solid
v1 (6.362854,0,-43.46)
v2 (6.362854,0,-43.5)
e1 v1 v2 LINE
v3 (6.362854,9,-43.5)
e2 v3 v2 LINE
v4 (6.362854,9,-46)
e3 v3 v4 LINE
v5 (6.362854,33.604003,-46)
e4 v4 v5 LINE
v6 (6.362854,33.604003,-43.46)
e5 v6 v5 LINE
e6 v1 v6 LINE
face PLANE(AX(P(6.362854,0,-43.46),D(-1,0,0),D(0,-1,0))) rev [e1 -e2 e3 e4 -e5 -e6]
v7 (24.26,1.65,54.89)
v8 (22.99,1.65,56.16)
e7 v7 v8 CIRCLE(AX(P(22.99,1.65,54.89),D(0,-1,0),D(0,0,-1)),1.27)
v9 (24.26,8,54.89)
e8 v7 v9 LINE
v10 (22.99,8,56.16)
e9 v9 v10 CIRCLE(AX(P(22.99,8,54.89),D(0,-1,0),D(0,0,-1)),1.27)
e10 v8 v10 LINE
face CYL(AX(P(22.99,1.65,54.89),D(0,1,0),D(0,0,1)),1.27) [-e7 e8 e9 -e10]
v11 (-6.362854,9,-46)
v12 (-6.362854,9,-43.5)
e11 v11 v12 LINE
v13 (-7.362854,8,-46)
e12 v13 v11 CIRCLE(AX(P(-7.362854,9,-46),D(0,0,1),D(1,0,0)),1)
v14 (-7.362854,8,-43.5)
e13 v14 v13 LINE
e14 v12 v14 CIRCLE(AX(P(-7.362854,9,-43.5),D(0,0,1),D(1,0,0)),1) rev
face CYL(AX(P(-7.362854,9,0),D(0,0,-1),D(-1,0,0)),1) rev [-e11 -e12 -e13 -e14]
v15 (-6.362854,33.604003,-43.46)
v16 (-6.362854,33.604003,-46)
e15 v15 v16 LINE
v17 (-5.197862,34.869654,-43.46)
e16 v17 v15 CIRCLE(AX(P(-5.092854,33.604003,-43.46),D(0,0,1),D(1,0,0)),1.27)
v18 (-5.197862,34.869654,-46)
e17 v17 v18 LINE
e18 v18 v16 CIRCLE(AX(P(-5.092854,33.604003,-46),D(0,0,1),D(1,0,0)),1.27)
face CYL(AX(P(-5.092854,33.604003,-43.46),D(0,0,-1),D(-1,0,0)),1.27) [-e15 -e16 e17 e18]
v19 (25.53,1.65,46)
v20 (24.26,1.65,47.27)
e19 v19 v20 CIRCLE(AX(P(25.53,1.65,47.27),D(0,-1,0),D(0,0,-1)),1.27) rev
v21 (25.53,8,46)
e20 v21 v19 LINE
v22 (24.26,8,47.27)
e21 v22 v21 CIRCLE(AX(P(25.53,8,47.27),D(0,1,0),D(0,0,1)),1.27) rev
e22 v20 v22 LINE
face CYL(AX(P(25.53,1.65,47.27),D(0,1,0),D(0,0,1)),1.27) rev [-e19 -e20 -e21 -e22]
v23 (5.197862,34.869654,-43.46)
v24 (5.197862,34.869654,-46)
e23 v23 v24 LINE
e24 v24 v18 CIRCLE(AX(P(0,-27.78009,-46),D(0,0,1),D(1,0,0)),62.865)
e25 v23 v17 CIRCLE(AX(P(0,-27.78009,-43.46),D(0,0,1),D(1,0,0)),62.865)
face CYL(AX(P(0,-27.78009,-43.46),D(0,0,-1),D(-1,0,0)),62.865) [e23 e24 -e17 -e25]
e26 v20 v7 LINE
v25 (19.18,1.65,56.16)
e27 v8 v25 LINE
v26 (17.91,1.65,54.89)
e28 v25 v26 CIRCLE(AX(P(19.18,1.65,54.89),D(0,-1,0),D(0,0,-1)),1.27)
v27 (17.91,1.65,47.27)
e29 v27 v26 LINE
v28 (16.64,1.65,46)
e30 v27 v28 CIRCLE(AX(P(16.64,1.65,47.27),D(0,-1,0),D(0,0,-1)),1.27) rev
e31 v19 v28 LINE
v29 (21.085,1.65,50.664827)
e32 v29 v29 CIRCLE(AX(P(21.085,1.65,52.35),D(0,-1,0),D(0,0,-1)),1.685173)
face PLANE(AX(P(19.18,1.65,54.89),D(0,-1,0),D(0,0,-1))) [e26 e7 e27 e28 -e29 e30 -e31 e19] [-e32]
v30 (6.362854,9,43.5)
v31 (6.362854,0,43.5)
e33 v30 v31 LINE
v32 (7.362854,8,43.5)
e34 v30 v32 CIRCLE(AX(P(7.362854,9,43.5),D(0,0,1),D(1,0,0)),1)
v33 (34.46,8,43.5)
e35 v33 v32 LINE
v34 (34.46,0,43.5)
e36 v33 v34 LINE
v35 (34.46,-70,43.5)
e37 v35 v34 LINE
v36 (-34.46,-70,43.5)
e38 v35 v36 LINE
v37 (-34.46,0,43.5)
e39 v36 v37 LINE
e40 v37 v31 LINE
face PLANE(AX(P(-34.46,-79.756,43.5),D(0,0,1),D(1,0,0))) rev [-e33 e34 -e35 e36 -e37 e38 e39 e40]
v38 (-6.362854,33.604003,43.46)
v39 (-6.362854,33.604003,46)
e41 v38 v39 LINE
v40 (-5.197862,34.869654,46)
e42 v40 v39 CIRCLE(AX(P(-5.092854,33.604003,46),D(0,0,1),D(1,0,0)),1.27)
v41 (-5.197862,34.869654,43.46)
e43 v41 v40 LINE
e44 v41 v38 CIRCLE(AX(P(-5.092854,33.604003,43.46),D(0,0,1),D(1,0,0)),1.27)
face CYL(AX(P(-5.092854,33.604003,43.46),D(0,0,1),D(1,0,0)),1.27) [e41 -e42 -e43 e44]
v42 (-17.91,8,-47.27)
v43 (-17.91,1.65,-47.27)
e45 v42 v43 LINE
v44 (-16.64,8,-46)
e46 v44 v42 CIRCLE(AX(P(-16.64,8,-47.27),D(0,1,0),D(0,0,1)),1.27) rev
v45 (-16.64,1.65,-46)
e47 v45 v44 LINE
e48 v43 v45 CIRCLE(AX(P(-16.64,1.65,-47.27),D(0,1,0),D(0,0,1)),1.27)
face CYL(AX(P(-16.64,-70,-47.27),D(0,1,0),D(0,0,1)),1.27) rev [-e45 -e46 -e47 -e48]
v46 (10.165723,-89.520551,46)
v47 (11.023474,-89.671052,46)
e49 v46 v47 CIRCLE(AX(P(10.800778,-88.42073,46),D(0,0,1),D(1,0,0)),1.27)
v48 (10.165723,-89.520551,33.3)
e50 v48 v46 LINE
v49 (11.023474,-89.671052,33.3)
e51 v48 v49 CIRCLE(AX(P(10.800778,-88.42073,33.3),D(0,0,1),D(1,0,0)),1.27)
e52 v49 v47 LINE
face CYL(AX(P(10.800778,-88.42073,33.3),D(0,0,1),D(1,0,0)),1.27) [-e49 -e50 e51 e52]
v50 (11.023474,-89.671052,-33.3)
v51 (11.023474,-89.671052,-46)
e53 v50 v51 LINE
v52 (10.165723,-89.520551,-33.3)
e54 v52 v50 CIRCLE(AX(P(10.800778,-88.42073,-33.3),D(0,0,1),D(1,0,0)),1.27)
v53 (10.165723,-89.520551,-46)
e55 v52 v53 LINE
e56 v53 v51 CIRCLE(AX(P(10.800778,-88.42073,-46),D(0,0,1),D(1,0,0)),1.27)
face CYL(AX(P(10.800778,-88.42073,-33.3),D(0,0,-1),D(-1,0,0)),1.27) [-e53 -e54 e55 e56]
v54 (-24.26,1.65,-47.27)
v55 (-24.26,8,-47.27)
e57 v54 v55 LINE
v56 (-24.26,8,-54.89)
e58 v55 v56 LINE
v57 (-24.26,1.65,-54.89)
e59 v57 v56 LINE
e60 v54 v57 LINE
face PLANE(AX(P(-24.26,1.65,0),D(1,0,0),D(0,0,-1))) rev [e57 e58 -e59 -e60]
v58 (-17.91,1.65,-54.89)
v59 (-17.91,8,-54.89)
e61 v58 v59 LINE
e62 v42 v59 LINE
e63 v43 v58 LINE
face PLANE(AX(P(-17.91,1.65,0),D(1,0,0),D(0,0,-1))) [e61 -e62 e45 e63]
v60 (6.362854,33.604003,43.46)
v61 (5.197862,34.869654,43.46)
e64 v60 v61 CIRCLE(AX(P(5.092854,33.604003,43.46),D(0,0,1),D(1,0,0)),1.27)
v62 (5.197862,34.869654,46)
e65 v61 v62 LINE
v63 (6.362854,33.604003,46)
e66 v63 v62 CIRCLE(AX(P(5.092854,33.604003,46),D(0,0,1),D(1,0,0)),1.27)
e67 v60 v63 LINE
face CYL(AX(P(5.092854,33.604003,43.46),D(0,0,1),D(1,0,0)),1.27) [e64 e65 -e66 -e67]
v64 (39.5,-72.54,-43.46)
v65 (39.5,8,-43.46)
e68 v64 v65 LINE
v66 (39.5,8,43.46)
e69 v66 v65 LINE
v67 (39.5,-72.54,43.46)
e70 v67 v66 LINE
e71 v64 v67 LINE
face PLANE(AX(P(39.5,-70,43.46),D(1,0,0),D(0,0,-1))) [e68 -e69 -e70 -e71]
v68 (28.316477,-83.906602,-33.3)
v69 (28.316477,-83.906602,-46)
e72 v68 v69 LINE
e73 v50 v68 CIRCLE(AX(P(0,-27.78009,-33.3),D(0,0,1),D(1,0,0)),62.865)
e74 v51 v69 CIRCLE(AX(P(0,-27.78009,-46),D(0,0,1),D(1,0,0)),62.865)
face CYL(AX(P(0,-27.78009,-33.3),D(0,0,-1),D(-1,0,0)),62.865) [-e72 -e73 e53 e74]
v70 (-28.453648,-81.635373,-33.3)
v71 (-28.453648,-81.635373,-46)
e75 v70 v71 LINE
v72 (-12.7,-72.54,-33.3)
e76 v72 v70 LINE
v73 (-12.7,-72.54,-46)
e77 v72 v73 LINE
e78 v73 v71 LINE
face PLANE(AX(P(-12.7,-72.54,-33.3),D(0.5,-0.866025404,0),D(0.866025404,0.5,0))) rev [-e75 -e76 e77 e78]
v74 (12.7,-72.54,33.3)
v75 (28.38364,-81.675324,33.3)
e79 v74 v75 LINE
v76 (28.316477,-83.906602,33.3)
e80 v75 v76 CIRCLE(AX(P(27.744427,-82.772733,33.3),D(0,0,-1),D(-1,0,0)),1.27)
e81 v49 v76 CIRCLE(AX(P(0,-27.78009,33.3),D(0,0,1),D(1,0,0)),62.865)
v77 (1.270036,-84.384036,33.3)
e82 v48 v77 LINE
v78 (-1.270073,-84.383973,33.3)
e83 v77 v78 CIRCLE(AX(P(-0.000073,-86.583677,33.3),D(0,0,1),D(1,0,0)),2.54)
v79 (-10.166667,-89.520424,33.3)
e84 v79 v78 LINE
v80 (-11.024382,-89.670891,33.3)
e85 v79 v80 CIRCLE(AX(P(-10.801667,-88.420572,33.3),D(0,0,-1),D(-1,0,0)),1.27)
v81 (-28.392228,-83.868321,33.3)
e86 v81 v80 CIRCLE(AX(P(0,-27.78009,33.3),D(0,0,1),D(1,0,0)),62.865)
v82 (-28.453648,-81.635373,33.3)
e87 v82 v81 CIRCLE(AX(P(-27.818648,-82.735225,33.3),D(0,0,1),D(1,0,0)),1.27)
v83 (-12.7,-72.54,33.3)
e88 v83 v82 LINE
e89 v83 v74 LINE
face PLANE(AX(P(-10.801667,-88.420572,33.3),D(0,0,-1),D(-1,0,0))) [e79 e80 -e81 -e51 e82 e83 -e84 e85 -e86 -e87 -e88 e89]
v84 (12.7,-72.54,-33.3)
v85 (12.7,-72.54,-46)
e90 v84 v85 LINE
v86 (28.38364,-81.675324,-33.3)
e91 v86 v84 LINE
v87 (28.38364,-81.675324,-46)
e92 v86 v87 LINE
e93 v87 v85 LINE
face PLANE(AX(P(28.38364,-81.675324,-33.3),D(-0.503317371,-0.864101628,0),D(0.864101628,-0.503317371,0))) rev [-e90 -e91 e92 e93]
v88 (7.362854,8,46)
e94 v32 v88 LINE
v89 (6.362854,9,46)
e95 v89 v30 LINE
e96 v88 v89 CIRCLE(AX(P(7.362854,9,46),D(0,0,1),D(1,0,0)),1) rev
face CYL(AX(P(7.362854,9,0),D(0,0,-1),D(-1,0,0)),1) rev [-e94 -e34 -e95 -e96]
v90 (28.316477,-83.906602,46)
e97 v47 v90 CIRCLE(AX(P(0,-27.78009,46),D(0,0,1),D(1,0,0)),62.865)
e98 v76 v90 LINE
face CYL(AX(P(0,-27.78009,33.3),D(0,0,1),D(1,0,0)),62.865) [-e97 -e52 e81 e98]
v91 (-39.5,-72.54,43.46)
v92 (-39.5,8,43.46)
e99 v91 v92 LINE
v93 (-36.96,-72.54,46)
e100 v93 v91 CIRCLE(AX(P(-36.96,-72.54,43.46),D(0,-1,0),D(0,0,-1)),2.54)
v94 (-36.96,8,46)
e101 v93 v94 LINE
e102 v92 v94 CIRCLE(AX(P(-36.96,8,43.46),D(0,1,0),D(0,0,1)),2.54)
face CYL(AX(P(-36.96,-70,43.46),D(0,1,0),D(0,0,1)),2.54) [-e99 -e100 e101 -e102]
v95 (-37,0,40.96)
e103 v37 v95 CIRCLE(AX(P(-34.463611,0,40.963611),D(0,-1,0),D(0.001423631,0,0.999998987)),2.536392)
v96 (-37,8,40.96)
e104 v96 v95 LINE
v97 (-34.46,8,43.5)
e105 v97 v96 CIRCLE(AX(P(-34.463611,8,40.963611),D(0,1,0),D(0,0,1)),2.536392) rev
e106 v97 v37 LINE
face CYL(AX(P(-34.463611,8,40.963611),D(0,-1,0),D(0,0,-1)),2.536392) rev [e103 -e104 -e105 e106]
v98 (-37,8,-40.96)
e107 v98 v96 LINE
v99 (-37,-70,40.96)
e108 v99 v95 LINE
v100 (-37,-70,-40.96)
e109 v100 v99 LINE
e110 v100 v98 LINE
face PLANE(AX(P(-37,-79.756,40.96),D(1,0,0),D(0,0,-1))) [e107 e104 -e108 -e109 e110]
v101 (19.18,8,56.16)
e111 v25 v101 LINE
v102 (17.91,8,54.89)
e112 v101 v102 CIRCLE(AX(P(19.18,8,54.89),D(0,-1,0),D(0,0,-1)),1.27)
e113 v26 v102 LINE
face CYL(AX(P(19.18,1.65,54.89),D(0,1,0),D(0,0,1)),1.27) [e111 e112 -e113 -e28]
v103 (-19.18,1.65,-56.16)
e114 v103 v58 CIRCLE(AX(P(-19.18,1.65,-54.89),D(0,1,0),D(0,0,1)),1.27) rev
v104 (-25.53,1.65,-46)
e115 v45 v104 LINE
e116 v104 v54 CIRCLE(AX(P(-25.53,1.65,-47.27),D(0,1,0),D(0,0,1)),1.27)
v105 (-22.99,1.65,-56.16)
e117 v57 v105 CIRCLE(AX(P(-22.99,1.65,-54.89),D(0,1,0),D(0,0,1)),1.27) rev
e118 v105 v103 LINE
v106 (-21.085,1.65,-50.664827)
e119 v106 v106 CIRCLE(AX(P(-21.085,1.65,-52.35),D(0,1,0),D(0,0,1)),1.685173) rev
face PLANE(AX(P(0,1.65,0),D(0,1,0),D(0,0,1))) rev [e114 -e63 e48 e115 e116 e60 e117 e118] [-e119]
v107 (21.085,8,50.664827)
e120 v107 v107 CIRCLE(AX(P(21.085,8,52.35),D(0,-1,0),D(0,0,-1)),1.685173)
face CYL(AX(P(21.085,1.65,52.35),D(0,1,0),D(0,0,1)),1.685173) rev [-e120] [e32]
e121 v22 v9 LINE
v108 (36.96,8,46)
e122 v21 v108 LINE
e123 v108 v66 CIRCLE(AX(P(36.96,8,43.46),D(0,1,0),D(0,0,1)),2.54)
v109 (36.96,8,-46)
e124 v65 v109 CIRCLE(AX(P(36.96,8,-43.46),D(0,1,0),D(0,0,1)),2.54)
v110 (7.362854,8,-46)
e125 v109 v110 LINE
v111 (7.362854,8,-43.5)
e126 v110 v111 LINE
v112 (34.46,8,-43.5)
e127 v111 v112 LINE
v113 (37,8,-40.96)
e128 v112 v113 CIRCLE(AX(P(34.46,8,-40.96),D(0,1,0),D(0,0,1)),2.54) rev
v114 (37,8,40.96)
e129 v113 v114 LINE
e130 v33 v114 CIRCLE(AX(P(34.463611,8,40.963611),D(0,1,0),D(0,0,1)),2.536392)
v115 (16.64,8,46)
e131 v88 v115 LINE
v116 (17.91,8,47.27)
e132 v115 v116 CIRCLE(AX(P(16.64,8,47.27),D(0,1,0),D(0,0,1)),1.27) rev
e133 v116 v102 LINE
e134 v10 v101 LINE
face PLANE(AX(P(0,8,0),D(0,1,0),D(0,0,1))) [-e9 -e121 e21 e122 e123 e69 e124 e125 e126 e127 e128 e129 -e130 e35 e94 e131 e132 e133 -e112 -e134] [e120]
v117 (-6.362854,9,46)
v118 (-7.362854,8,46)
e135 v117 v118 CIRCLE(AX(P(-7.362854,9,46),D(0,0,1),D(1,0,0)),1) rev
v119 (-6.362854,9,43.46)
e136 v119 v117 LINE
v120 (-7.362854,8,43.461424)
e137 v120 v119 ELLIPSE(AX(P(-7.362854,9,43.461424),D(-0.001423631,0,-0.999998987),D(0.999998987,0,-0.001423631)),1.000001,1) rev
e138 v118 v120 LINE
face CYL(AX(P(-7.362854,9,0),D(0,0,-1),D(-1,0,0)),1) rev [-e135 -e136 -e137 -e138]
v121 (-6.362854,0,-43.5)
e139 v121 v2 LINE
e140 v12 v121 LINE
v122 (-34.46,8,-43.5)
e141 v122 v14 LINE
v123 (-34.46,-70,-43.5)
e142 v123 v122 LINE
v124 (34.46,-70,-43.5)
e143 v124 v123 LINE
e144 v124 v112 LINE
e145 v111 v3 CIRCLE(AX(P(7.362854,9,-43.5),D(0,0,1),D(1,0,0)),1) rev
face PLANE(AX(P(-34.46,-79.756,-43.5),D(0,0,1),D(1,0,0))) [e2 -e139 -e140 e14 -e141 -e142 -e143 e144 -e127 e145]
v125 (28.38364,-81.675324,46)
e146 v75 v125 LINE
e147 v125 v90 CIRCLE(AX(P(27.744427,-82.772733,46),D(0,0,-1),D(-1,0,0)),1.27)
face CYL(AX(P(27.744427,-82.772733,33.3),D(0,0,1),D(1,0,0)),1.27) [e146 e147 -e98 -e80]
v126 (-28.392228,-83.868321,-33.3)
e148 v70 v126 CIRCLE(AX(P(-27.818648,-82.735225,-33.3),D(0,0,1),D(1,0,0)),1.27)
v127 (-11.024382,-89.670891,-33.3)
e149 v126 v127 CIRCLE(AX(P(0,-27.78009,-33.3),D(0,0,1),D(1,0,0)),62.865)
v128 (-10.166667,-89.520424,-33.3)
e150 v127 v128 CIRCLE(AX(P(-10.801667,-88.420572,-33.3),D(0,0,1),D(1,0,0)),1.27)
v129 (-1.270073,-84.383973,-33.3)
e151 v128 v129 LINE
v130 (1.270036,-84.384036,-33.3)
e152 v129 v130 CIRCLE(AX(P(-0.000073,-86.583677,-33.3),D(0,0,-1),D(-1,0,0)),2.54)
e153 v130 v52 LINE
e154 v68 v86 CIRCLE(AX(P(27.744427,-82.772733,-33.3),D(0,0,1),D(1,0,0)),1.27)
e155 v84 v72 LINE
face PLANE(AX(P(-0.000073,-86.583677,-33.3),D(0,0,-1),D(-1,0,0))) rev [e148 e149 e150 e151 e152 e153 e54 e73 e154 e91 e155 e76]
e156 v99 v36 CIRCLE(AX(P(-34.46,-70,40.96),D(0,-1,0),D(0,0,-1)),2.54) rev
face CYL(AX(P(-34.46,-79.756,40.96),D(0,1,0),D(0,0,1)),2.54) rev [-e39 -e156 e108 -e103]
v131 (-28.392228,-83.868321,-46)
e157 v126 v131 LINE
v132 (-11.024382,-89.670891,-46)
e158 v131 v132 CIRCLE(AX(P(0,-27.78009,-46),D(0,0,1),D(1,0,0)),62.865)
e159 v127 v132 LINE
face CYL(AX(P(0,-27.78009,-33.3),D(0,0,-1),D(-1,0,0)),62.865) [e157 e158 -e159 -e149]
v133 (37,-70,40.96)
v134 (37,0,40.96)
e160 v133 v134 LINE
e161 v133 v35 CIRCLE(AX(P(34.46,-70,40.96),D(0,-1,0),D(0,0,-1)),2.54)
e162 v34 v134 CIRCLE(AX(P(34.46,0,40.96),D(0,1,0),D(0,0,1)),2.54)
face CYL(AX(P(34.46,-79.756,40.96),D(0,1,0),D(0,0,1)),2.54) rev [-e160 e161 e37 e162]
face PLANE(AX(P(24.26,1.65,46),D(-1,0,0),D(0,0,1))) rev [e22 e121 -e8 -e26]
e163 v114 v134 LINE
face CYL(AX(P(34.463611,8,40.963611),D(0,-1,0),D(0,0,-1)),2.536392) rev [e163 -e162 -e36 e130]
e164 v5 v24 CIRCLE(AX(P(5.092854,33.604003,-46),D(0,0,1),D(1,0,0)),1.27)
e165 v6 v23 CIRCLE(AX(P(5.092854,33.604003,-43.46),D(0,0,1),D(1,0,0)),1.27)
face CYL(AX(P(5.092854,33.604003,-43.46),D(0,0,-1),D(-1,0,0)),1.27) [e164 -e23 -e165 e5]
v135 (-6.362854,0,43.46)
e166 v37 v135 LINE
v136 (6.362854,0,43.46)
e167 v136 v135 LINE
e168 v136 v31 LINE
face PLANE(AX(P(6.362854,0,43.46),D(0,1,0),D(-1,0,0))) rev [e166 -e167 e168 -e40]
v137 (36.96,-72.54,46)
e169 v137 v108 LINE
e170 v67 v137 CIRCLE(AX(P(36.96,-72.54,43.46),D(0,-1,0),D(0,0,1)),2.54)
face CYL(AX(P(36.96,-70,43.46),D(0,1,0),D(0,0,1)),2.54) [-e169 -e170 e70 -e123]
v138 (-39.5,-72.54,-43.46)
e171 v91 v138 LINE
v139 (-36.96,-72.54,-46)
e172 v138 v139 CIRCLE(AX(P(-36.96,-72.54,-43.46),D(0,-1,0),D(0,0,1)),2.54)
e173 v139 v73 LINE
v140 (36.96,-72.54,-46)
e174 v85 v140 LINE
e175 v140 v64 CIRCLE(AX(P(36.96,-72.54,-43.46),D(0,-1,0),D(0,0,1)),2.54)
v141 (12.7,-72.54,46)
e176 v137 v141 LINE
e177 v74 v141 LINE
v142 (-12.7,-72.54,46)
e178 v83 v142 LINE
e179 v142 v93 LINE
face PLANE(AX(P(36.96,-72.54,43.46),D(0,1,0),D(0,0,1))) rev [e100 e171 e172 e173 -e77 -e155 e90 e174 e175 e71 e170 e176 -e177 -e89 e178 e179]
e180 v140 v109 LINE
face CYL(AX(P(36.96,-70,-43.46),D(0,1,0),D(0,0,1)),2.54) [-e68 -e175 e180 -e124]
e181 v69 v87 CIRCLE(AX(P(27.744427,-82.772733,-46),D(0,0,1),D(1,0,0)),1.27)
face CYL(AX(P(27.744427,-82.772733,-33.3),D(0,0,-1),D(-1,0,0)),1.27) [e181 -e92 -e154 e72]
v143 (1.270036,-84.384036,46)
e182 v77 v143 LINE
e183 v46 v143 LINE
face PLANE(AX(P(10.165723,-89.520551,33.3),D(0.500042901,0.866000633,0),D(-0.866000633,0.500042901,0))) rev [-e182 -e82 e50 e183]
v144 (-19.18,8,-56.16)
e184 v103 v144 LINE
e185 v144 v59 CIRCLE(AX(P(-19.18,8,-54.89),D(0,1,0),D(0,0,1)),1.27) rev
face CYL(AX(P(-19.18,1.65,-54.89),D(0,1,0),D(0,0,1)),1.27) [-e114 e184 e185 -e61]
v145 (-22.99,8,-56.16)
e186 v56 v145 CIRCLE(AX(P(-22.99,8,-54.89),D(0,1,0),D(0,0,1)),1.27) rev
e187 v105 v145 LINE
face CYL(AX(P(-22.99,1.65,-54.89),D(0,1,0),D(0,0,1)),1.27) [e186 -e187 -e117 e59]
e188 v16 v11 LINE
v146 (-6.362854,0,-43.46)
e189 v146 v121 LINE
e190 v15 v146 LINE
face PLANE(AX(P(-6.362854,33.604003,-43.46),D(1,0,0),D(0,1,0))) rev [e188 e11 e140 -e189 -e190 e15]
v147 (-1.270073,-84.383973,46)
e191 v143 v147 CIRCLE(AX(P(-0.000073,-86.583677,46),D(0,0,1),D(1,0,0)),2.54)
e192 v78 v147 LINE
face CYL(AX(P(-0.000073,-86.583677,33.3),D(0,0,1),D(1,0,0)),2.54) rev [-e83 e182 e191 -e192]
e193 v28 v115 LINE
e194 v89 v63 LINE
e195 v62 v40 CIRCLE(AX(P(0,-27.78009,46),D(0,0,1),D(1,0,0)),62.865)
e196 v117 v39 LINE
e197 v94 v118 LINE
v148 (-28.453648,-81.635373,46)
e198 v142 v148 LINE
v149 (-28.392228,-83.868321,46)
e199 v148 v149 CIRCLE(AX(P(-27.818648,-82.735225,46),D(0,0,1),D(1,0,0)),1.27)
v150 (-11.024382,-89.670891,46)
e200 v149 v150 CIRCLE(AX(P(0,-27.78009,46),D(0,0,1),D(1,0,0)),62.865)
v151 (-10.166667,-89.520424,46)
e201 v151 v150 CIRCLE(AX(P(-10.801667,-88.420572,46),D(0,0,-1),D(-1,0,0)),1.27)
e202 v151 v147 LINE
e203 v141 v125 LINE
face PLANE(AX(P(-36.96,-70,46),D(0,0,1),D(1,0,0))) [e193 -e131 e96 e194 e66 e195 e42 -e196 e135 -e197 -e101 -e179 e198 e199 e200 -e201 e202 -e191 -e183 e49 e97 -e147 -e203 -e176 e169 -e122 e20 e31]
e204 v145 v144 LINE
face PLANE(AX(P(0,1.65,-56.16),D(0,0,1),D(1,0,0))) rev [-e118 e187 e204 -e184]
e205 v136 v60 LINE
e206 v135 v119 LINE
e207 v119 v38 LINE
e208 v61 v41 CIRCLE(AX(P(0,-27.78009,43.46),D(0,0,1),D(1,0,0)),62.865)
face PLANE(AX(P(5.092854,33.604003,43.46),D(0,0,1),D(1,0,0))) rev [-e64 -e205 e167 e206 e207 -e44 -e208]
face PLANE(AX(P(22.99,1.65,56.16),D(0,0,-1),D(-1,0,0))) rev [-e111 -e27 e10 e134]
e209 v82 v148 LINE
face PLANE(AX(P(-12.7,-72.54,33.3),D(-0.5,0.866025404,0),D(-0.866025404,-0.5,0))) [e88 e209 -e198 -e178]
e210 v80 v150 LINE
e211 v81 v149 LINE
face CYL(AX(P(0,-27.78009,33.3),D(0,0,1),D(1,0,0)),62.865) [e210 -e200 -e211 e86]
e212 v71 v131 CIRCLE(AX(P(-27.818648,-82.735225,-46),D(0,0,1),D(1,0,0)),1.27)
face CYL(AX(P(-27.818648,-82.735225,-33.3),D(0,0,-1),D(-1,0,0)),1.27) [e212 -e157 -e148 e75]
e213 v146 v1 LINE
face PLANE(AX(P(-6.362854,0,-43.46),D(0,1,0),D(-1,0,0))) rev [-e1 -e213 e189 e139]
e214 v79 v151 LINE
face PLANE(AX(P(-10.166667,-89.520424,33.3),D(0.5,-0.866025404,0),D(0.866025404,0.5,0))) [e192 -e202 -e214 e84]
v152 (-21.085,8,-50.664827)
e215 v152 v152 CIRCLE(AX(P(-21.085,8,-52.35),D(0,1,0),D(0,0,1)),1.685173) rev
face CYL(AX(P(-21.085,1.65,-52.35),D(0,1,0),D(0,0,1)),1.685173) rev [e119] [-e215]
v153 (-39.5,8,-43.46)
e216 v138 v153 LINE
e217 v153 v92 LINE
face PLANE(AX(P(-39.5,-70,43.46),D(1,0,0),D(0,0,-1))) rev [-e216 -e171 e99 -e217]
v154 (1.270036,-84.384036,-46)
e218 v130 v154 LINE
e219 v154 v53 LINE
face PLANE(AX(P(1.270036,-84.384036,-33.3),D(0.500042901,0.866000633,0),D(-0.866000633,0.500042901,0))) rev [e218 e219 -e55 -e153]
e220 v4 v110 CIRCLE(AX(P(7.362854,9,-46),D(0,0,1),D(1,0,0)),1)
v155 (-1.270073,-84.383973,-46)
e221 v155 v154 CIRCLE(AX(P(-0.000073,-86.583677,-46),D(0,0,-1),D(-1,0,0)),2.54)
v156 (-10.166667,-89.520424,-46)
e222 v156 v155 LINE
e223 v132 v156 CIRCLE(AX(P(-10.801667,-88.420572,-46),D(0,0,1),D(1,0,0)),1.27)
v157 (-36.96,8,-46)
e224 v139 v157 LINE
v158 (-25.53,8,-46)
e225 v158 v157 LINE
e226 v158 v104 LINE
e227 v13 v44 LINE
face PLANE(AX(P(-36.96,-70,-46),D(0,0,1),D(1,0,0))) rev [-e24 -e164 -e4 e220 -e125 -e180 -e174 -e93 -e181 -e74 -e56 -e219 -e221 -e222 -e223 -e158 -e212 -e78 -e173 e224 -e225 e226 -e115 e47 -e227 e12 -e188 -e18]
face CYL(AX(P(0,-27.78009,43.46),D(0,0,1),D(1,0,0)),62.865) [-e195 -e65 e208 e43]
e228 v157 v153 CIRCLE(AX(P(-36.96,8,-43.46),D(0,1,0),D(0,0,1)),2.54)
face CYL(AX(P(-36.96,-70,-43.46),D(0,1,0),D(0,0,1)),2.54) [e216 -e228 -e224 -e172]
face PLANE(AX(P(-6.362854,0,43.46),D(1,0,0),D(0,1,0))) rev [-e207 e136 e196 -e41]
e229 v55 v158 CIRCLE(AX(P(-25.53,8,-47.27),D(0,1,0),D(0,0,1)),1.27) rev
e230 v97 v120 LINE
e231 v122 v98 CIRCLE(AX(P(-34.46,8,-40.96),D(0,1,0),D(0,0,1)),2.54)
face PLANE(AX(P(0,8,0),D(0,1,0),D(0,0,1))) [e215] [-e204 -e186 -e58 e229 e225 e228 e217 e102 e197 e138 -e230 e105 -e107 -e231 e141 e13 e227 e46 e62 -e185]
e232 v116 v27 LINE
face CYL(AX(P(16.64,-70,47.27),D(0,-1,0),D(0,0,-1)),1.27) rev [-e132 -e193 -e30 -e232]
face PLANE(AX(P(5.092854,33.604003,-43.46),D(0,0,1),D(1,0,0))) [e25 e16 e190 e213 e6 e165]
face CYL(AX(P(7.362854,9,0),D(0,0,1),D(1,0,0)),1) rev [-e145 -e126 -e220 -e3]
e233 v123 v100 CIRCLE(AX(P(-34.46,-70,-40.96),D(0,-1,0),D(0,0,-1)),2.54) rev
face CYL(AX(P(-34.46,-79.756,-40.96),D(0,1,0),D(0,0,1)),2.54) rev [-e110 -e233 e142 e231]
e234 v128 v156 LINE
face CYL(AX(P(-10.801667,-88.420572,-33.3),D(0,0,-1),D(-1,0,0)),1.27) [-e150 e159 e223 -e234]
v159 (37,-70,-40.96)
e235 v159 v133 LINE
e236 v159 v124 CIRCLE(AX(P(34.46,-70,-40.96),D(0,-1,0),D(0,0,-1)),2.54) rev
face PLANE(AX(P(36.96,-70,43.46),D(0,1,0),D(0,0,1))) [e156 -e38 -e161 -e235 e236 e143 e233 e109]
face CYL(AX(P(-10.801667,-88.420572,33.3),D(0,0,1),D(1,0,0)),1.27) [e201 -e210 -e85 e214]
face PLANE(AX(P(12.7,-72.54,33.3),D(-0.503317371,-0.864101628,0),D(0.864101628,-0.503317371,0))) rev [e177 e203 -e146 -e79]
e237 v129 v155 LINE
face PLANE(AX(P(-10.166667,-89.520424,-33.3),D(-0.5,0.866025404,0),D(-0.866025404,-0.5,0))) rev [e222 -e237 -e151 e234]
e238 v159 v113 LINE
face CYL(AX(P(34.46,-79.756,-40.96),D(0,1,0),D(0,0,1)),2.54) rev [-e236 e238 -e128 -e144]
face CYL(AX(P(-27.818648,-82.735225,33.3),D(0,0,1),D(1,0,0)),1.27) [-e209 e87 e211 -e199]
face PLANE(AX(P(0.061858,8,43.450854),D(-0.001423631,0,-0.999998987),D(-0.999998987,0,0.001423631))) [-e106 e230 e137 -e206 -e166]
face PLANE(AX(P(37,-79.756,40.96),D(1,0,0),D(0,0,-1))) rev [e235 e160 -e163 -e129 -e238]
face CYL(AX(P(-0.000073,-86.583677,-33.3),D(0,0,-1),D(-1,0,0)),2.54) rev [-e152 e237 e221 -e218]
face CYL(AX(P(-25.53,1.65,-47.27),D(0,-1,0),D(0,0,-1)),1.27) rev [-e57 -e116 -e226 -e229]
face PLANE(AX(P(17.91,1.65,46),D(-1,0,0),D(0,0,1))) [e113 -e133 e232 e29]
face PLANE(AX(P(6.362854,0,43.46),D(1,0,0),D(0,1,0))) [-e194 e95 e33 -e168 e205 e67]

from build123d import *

# Parameters (mm, degrees)
BOSS_EXTRUDE1_DEPTH = 70
CUT_EXTRUDE1_DEPTH  = 79.756
BOSS_EXTRUDE3_DEPTH = 2.54
BOSS_EXTRUDE4_DEPTH = 2.54
BOSS_EXTRUDE5_DEPTH = 12.7
BOSS_EXTRUDE6_START = -2.54
BOSS_EXTRUDE6_DEPTH = 2.54
BOSS_EXTRUDE7_START = -12.7
BOSS_EXTRUDE7_DEPTH = 12.7
BOSS_EXTRUDE8_START = 8
BOSS_EXTRUDE8_DEPTH = 8
SKETCH9_R           = 1.685173155
BOSS_EXTRUDE9_DEPTH = 6.35
FILLET1_R           = 1.27
FILLET3_R           = 1


with BuildPart() as part:
    # Sketch1 → Boss-Extrude1 (new body)
    with BuildSketch(Plane(origin=(0, 0, 0), x_dir=(1, 0, 0), z_dir=(0, 1, 0))):
        with BuildLine():
            Line((-36.96, -46), (36.96, -46))
            ThreePointArc((36.96, -46), (38.756051224, -45.256051224), (39.5, -43.46))
            Line((39.5, -43.46), (39.5, 43.46))
            ThreePointArc((39.5, 43.46), (38.756051224, 45.256051224), (36.96, 46))
            Line((36.96, 46), (-36.96, 46))
            ThreePointArc((-36.96, 46), (-38.756051224, 45.256051224), (-39.5, 43.46))
            Line((-39.5, 43.46), (-39.5, -43.46))
            ThreePointArc((-39.5, -43.46), (-38.756051224, -45.256051224), (-36.96, -46))
        make_face()
    extrude(amount=-BOSS_EXTRUDE1_DEPTH)

    # Sketch2 → Cut-Extrude1 (cut)
    with BuildSketch(Plane(origin=(0, 0, 0), x_dir=(1, 0, 0), z_dir=(0, 1, 0))):
        with BuildLine():
            Line((-34.46, -43.5), (34.46, -43.5))
            ThreePointArc((34.46, -43.5), (36.256051224, -42.756051224), (37, -40.96))
            Line((37, -40.96), (37, 40.96))
            ThreePointArc((37, 40.96), (36.256051224, 42.756051224), (34.46, 43.5))
            Line((34.46, 43.5), (-34.46, 43.5))
            ThreePointArc((-34.46, 43.5), (-36.256051224, 42.756051224), (-37, 40.96))
            Line((-37, 40.96), (-37, -40.96))
            ThreePointArc((-37, -40.96), (-36.256051224, -42.756051224), (-34.46, -43.5))
        make_face()
    extrude(amount=-CUT_EXTRUDE1_DEPTH, mode=Mode.SUBTRACT)

    # Sketch4 → Boss-Extrude3 (add)
    with BuildSketch(Plane.XZ.offset(70)):
        with BuildLine():
            Line((36.96, 46), (-36.96, 46))
            ThreePointArc((-36.96, 46), (-38.756051224, 45.256051224), (-39.5, 43.46))
            Line((-39.5, 43.46), (-39.5, -43.46))
            ThreePointArc((-39.5, -43.46), (-38.756051224, -45.256051224), (-36.96, -46))
            Line((-36.96, -46), (36.96, -46))
            ThreePointArc((36.96, -46), (38.756051224, -45.256051224), (39.5, -43.46))
            Line((39.5, -43.46), (39.5, 43.46))
            ThreePointArc((39.5, 43.46), (38.756051224, 45.256051224), (36.96, 46))
        make_face()
    extrude(amount=BOSS_EXTRUDE3_DEPTH)

    # Sketch5 → Boss-Extrude4 (add)
    with BuildSketch(Plane.XY.offset(46)):
        with BuildLine():
            Line((6.362854251, 0), (6.362854251, 33.604002981))
            ThreePointArc((6.362854251, 33.604002981), (6.027268312, 34.464102023), (5.197861555, 34.869654381))
            ThreePointArc((5.197861555, 34.869654381), (0, 35.084910085), (-5.197861555, 34.869654381))
            ThreePointArc((-5.197861555, 34.869654381), (-6.027268312, 34.464102023), (-6.362854251, 33.604002981))
            Line((-6.362854251, 33.604002981), (-6.362854251, 0))
            Line((-6.362854251, 0), (6.362854251, 0))
        make_face()
    extrude(amount=-BOSS_EXTRUDE4_DEPTH)

    # Sketch5<4> → Boss-Extrude5 (add)
    with BuildSketch(Plane.XY.offset(46)):
        with BuildLine():
            Line((-12.7, -72.54), (-28.453647637, -81.635372704))
            ThreePointArc((-28.453647637, -81.635372704), (-29.088167479, -82.770144478), (-28.392228001, -83.868320535))
            ThreePointArc((-28.392228001, -83.868320535), (-19.920711126, -87.405365539), (-11.024381507, -89.670890825))
            ThreePointArc((-11.024381507, -89.670890825), (-10.582224591, -89.671469352), (-10.166666729, -89.520423878))
            Line((-10.166666729, -89.520423878), (-1.270072648, -84.383972891))
            ThreePointArc((-1.270072648, -84.383972891), (-9.734e-06, -84.043677417), (1.270036321, -84.384035808))
            Line((1.270036321, -84.384035808), (10.165723413, -89.520550737))
            ThreePointArc((10.165723413, -89.520550737), (10.581295609, -89.671620625), (11.023474349, -89.671052407))
            ThreePointArc((11.023474349, -89.671052407), (19.880019162, -87.418945228), (28.31647684, -83.906602049))
            ThreePointArc((28.31647684, -83.906602049), (29.01385185, -82.810943696), (28.383639864, -81.675324049))
            Line((28.383639864, -81.675324049), (12.7, -72.54))
            Line((12.7, -72.54), (-12.7, -72.54))
        make_face()
    extrude(amount=-BOSS_EXTRUDE5_DEPTH)

    # Sketch6 → Boss-Extrude6 (add)
    with BuildSketch(Plane(origin=(0, 0, -46), x_dir=(-1, 0, 0), z_dir=(0, 0, -1)).offset(BOSS_EXTRUDE6_START)):
        with BuildLine():
            Line((-6.362854251, 0), (-6.362854251, 33.604002981))
            ThreePointArc((-6.362854251, 33.604002981), (-6.027268312, 34.464102023), (-5.197861555, 34.869654381))
            ThreePointArc((-5.197861555, 34.869654381), (0, 35.084910085), (5.197861555, 34.869654381))
            ThreePointArc((5.197861555, 34.869654381), (6.027268312, 34.464102023), (6.362854251, 33.604002981))
            Line((6.362854251, 33.604002981), (6.362854251, 0))
            Line((6.362854251, 0), (-6.362854251, 0))
        make_face()
    extrude(amount=BOSS_EXTRUDE6_DEPTH)

    # Sketch6<3> → Boss-Extrude7 (add)
    with BuildSketch(Plane(origin=(0, 0, -46), x_dir=(-1, 0, 0), z_dir=(0, 0, -1)).offset(BOSS_EXTRUDE7_START)):
        with BuildLine():
            Line((-12.7, -72.54), (12.7, -72.54))
            Line((12.7, -72.54), (28.453647637, -81.635372704))
            ThreePointArc((28.453647637, -81.635372704), (29.088167479, -82.770144478), (28.392228001, -83.868320535))
            ThreePointArc((28.392228001, -83.868320535), (19.920711126, -87.405365539), (11.024381507, -89.670890825))
            ThreePointArc((11.024381507, -89.670890825), (10.582224591, -89.671469352), (10.166666729, -89.520423878))
            Line((10.166666729, -89.520423878), (1.270072648, -84.383972891))
            ThreePointArc((1.270072648, -84.383972891), (9.734e-06, -84.043677417), (-1.270036321, -84.384035808))
            Line((-1.270036321, -84.384035808), (-10.165723413, -89.520550737))
            ThreePointArc((-10.165723413, -89.520550737), (-10.581295609, -89.671620625), (-11.023474349, -89.671052407))
            ThreePointArc((-11.023474349, -89.671052407), (-19.880019162, -87.418945228), (-28.31647684, -83.906602049))
            ThreePointArc((-28.31647684, -83.906602049), (-29.01385185, -82.810943696), (-28.383639864, -81.675324049))
            Line((-28.383639864, -81.675324049), (-12.7, -72.54))
        make_face()
    extrude(amount=BOSS_EXTRUDE7_DEPTH)

    # Sketch8 → Boss-Extrude8 (add)
    with BuildSketch(Plane(origin=(0, 0, 0), x_dir=(1, 0, 0), z_dir=(0, 1, 0)).offset(BOSS_EXTRUDE8_START)):
        with BuildLine():
            Line((6.362854251, -43.5), (6.362854251, -46))
            Line((6.362854251, -46), (36.96, -46))
            ThreePointArc((36.96, -46), (38.756051224, -45.256051224), (39.5, -43.46))
            Line((39.5, -43.46), (39.5, 43.46))
            ThreePointArc((39.5, 43.46), (38.756051224, 45.256051224), (36.96, 46))
            Line((36.96, 46), (6.362854251, 46))
            Line((6.362854251, 46), (6.362854251, 43.5))
            Line((6.362854251, 43.5), (34.46, 43.5))
            ThreePointArc((34.46, 43.5), (36.256051224, 42.756051224), (37, 40.96))
            Line((37, 40.96), (37, -40.96))
            ThreePointArc((37, -40.96), (36.257110645, -42.757110645), (34.46, -43.5))
            Line((34.46, -43.5), (6.362854251, -43.5))
        make_face()
        with BuildLine():
            Line((-37, -40.96), (-37, 40.96))
            ThreePointArc((-37, 40.96), (-36.256051224, 42.756051224), (-34.46, 43.5))
            Line((-34.46, 43.5), (-6.362854251, 43.5))
            Line((-6.362854251, 43.5), (-6.362854251, 46))
            Line((-6.362854251, 46), (-36.96, 46))
            ThreePointArc((-36.96, 46), (-38.756051224, 45.256051224), (-39.5, 43.46))
            Line((-39.5, 43.46), (-39.5, -43.46))
            ThreePointArc((-39.5, -43.46), (-38.756051224, -45.256051224), (-36.96, -46))
            Line((-36.96, -46), (-6.362854251, -46))
            Line((-6.362854251, -46), (-6.362854251, -43.46))
            Line((-6.362854251, -43.46), (-34.46, -43.5))
            ThreePointArc((-34.46, -43.5), (-36.257110645, -42.757110645), (-37, -40.96))
        make_face()
    extrude(amount=-BOSS_EXTRUDE8_DEPTH)

    # Sketch9 → Boss-Extrude9 (add)
    # profile 1 of 2: a face of its own
    with BuildSketch(Plane(origin=(0, 8, 0), x_dir=(1, 0, 0), z_dir=(0, 1, 0))):
        with BuildLine():
            Line((-24.26, 46), (-17.91, 46))
            Line((-17.91, 46), (-17.91, 54.89))
            ThreePointArc((-17.91, 54.89), (-18.281974388, 55.788025612), (-19.18, 56.16))
            Line((-19.18, 56.16), (-22.99, 56.16))
            ThreePointArc((-22.99, 56.16), (-23.888025612, 55.788025612), (-24.26, 54.89))
            Line((-24.26, 54.89), (-24.26, 46))
        make_face()
        with Locations((-21.085, 52.35)):
            Circle(SKETCH9_R, mode=Mode.SUBTRACT)
    # profile 2 of 2: a face of its own
    with BuildSketch(Plane(origin=(0, 8, 0), x_dir=(1, 0, 0), z_dir=(0, 1, 0))):
        with BuildLine():
            Line((24.26, -46), (17.91, -46))
            Line((17.91, -46), (17.91, -54.89))
            ThreePointArc((17.91, -54.89), (18.281974388, -55.788025612), (19.18, -56.16))
            Line((19.18, -56.16), (22.99, -56.16))
            ThreePointArc((22.99, -56.16), (23.888025612, -55.788025612), (24.26, -54.89))
            Line((24.26, -54.89), (24.26, -46))
        make_face()
        with Locations((21.085, -52.35)):
            Circle(SKETCH9_R, mode=Mode.SUBTRACT)
    extrude(amount=-BOSS_EXTRUDE9_DEPTH)

    # Fillet1
    fillet1_edges = [part.edges().sort_by_distance(p)[0] for p in [
        (-24.26, 4.825, -46),
        (-17.91, 4.825, -46),
        (17.91, 4.825, 46),
        (24.26, 4.825, 46),
    ]]
    fillet(fillet1_edges, radius=FILLET1_R)

    # Fillet3
    fillet3_edges = [part.edges().sort_by_distance(p)[0] for p in [
        (-6.362854251, 8, 44.73),
        (6.362854251, 8, 44.75),
        (6.362854251, 8, -44.75),
        (-6.362854251, 8, -44.75),
    ]]
    fillet(fillet3_edges, radius=FILLET3_R)


solid = part.part
